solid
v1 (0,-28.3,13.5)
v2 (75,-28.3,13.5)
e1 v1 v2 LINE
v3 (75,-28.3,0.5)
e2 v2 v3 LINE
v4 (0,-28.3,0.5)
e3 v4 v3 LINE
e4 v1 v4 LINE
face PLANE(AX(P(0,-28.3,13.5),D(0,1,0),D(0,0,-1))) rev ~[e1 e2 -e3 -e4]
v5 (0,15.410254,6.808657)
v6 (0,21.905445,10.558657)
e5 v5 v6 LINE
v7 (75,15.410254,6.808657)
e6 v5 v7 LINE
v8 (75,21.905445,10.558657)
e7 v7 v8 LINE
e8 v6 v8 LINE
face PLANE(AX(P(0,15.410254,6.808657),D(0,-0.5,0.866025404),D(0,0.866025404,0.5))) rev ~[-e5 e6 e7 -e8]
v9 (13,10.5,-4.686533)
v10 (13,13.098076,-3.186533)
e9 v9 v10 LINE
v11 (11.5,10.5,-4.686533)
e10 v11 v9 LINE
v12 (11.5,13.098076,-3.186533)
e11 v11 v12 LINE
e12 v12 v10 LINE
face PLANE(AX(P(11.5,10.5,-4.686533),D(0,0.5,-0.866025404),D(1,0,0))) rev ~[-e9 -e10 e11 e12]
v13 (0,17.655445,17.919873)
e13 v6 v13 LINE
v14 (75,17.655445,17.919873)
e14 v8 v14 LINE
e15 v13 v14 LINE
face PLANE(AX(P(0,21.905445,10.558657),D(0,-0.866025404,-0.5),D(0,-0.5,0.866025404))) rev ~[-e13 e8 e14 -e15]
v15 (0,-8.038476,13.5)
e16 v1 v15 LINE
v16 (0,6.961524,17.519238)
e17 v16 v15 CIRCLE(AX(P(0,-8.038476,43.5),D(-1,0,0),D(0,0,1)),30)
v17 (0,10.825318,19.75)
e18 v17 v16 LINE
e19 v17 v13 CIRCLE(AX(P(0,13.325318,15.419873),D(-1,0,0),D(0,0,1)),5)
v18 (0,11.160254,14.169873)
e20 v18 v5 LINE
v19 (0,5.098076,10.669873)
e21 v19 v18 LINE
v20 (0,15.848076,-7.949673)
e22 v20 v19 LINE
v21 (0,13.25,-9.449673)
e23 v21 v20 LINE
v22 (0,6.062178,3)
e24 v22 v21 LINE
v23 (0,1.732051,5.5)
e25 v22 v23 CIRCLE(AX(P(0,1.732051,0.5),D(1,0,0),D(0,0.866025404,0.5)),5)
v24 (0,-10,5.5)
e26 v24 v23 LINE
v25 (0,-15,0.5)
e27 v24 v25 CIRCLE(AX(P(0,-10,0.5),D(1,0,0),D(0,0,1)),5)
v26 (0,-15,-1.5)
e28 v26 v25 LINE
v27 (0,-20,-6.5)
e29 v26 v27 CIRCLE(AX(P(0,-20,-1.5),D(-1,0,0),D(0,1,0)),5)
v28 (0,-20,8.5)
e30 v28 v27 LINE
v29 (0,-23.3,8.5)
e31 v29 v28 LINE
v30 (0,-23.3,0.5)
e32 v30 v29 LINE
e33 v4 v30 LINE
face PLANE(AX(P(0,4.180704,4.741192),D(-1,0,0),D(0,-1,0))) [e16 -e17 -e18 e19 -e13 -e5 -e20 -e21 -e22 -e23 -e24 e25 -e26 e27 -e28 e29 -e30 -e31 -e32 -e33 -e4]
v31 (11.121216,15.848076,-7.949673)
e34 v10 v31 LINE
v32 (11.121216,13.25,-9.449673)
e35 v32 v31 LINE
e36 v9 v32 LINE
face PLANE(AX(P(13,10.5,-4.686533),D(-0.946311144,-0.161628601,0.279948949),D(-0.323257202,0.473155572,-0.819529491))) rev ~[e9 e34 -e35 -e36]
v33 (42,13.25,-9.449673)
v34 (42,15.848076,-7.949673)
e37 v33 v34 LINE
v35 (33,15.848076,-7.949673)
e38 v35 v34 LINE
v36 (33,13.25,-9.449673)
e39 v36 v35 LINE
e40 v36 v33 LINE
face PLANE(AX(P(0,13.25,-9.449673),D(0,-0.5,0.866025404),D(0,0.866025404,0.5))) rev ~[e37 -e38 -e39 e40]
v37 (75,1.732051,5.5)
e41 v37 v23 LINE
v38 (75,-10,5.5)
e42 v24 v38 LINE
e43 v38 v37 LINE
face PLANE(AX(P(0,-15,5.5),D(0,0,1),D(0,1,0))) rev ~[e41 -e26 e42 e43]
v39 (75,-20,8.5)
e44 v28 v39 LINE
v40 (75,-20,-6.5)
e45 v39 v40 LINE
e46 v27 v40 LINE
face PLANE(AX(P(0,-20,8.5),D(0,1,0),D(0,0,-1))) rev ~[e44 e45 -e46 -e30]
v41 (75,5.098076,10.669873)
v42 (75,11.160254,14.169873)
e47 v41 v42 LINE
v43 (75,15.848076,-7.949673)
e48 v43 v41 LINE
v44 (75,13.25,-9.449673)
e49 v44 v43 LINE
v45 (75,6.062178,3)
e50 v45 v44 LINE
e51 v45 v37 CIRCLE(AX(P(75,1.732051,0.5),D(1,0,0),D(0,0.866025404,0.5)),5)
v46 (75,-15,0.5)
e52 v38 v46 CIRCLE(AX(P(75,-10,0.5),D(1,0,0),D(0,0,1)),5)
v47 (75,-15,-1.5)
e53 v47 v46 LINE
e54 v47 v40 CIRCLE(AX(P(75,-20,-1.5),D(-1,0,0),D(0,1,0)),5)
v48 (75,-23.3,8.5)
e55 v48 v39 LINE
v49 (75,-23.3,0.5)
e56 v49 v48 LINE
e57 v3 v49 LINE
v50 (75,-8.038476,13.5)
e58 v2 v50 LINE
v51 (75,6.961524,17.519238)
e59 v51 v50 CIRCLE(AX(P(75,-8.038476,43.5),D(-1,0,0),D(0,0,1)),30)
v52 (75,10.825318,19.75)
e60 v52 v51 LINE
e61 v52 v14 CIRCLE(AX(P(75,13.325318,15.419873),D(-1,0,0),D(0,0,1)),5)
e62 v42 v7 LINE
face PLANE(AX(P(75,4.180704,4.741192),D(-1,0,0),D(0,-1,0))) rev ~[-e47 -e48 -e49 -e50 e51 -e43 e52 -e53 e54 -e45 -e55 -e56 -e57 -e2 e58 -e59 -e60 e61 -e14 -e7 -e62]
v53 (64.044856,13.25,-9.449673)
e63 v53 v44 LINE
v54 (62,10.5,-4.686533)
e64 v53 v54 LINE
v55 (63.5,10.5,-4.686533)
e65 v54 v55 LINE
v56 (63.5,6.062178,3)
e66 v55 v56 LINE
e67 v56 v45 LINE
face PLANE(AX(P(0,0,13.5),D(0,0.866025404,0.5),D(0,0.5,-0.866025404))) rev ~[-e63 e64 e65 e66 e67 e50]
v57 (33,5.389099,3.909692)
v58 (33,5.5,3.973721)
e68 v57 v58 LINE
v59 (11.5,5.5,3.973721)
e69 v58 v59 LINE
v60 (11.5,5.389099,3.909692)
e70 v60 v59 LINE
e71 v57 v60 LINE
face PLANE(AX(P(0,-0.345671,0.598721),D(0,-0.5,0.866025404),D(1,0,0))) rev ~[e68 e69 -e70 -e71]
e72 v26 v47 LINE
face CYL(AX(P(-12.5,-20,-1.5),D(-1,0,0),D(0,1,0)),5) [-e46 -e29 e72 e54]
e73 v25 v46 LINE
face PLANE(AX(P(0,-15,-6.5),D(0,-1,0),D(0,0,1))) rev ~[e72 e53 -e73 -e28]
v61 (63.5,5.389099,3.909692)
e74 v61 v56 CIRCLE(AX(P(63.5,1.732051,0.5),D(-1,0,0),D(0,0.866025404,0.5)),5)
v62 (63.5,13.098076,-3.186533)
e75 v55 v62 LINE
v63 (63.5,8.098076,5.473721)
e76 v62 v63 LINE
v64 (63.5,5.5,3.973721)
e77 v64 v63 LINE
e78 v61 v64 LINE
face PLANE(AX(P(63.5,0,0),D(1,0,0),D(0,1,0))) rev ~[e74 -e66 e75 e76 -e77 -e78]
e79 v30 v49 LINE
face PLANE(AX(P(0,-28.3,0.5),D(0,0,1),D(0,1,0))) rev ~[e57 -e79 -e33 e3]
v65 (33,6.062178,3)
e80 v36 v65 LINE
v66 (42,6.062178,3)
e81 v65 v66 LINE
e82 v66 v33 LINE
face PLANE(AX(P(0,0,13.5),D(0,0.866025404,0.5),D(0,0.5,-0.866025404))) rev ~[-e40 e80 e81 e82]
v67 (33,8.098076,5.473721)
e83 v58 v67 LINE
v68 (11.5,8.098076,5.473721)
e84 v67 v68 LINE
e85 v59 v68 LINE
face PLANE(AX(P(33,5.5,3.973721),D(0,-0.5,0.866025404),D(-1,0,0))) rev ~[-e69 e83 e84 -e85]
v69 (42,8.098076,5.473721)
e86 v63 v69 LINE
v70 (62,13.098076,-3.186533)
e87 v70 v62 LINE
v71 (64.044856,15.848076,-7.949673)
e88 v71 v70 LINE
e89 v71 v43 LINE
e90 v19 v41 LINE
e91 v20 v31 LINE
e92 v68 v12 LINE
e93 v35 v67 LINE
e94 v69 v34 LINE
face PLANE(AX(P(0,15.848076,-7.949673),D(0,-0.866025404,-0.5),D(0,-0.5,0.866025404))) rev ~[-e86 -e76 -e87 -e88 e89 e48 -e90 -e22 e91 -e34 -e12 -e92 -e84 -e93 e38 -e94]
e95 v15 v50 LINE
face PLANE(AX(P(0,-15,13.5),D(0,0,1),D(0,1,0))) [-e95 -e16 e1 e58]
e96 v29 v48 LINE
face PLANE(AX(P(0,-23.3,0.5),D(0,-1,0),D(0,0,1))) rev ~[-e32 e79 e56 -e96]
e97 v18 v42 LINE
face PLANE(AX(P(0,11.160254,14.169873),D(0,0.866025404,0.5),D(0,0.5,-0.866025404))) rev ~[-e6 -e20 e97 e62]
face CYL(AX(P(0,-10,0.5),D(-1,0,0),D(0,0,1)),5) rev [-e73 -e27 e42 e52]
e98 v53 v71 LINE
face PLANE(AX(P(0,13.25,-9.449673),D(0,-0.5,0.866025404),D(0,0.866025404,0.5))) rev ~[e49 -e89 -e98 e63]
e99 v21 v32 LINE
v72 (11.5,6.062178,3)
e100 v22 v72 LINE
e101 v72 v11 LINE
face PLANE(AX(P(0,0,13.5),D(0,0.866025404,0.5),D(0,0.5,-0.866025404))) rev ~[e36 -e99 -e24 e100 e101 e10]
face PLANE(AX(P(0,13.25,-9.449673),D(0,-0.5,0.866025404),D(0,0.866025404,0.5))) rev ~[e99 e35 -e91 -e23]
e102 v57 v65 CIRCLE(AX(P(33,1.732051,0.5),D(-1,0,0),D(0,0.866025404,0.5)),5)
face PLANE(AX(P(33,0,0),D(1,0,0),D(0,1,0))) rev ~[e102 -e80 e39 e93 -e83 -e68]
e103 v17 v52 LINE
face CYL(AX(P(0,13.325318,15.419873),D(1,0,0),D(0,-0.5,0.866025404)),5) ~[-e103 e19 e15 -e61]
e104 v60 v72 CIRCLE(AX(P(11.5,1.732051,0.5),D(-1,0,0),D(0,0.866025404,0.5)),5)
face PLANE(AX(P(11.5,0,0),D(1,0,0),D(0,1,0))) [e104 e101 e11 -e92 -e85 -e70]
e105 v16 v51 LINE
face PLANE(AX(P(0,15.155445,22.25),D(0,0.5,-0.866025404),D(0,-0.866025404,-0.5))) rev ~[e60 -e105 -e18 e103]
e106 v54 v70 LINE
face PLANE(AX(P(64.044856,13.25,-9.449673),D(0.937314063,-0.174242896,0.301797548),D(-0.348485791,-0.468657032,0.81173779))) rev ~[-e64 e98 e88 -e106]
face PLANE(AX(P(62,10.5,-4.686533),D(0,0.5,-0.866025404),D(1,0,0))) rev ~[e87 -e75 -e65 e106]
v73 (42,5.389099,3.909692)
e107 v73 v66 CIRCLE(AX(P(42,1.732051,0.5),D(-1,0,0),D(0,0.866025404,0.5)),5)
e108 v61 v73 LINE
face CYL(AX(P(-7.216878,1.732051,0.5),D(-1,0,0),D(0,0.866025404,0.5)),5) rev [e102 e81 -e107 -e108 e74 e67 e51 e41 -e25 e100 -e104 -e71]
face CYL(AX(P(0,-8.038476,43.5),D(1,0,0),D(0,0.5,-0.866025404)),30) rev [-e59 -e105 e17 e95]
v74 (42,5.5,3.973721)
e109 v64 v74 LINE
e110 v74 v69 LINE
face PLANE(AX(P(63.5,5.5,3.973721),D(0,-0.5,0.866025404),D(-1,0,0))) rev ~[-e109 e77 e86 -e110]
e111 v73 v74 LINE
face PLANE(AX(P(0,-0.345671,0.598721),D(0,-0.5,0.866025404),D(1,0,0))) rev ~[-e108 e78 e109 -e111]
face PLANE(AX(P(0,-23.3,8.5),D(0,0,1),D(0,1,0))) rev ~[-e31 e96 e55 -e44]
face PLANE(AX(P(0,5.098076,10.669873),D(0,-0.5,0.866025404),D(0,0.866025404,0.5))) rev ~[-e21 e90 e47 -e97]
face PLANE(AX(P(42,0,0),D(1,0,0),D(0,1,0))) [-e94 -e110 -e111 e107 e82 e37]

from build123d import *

# Parameters (mm, degrees)
F1_DEPTH      = 75
F2_W          = 3.3
F2_H          = 5
F3_DEPTH      = 75
F5_DEPTH      = 3
F6_ANGLE      = -30
F7_W          = 15
F7_H          = 8
F8_DEPTH      = 75
F9_R          = 5
F10_T1_DEPTH  = 75
F10_T6_DEPTH  = 82.2168783649
F10_T11_DEPTH = 82.2168783649
F10_T17_DEPTH = 89.4337567297
F10_T23_DEPTH = 82.2168783649
F10_T25_DEPTH = 100
F11_R         = 30


# Not quite as in the source:
# - a fillet or chamfer that OpenCascade refuses, or shapes differently, is made with other operations: its cross-section is extruded or revolved along the edge and cut away or added


with BuildPart() as f1:
    # F0 (on Right) → F1 (new body)
    with BuildSketch(Plane.YZ):
        Polygon((3, 13.5), (0, 13.5), (0, -13), (3, -13), (3, 8.5), (10, 8.5), (10, 0), (17.5, 0), (17.5, 13.5), (10, 13.5), align=None)
    extrude(amount=F1_DEPTH)

    # F4 (on Front) → F5 (cut, through all)
    with BuildSketch(Plane.XZ):
        Polygon((11.5, 2.5), (11.5, -7.5), (13, -7.5), (11.1212156062, -13), (33, -13), (33, -7.4999375637), (33, 2.5), align=None)
        Polygon((63.5, 2.5), (42, 2.5), (42, -7.4999375637), (42, -13), (64.044855535, -13), (62, -7.5), (63.5, -7.5), align=None)
    extrude(amount=-F5_DEPTH, mode=Mode.SUBTRACT)


with BuildPart() as f3:
    # F2 (on Right) → F3 (new body)
    with BuildSketch(Plane.YZ):
        Polygon((-23.3, 13.5), (-28.3, 13.5), (-28.3, 0.5), (-23.3, 0.5), (-23.3, 8.5), align=None)
        with Locations((-21.65, 11)):
            Rectangle(F2_W, F2_H)
        Polygon((-15, 13.5), (-20, 13.5), (-20, 8.5), (-20, -6.5), (-15, -6.5), align=None)
    extrude(amount=F3_DEPTH)


with BuildPart() as f1_1:
    # F6: moved
    add(f1.part.rotate(Axis((37.5, 0, 13.5), (-1, 0, 0)), F6_ANGLE))


    add(f3.part)  # F8 merges F3
    # F7 (on Right) → F8 (join)
    with BuildSketch(Plane.YZ):
        with Locations((-7.5, 9.5)):
            Rectangle(F7_W, F7_H)
        Polygon((5.764299538, 5.5), (0, 13.5), (0, 5.5), align=None)
    extrude(amount=F8_DEPTH)

    # F9
    f9_edges = [f1_1.edges().sort_by_distance(p)[0] for p in [
        (37.5, 15.155445, 22.25),
    ]]
    fillet(f9_edges, radius=F9_R)

    # F10: fillet of radius 5 on 3 edges, made by hand

    # F10_s2 → F10_t1 (join)
    with BuildSketch(Plane.YZ):
        with BuildLine():
            ThreePointArc((-10, 5.5), (-13.5355339059, 4.0355339059), (-15, 0.5))
            Line((-15, 0.5), (-15, 5.5))
            Line((-15, 5.5), (-10, 5.5))
        make_face()
    extrude(amount=F10_T1_DEPTH)


with BuildPart() as f10_tool4:
    # F10_s5 → F10_t6 (new body)
    with BuildSketch(Plane.YZ):
        with BuildLine():
            ThreePointArc((6.0621778265, 3), (4.2320508076, 4.8301270189), (1.7320508076, 5.5))
            Line((1.7320508076, 5.5), (4.6188021535, 5.5))
            Line((4.6188021535, 5.5), (6.0621778265, 3))
        make_face()
    extrude(amount=F10_T6_DEPTH)

    split(bisect_by=Plane.YZ.offset(11.5), keep=Keep.BOTTOM)


with BuildPart() as f1_2:
    add(f1_1.part)

    # F10_t3: union F10_tool4
    add(f10_tool4.part)


with BuildPart() as f10_tool9:
    # F10_s10 → F10_t11 (new body)
    with BuildSketch(Plane.YZ.offset(-7.2168783649)):
        with BuildLine():
            ThreePointArc((6.0621778265, 3), (4.2320508076, 4.8301270189), (1.7320508076, 5.5))
            Line((1.7320508076, 5.5), (4.6188021535, 5.5))
            Line((4.6188021535, 5.5), (6.0621778265, 3))
        make_face()
    extrude(amount=F10_T11_DEPTH)

    split(bisect_by=Plane(origin=(0, -0.3456714755, 0.5987205584), x_dir=(1, 0, 0), z_dir=(0, -0.5, 0.8660254038)), keep=Keep.TOP)

    split(bisect_by=Plane.YZ.offset(11.5), keep=Keep.TOP)


with BuildPart() as f1_3:
    add(f1_2.part)

    # F10_t8: union F10_tool9
    add(f10_tool9.part)


with BuildPart() as f10_tool15:
    # F10_s16 → F10_t17 (new body)
    with BuildSketch(Plane.YZ.offset(-7.2168783649)):
        with BuildLine():
            ThreePointArc((6.0621778265, 3), (4.2320508076, 4.8301270189), (1.7320508076, 5.5))
            Line((1.7320508076, 5.5), (4.6188021535, 5.5))
            Line((4.6188021535, 5.5), (6.0621778265, 3))
        make_face()
    extrude(amount=F10_T17_DEPTH)

    split(bisect_by=Plane.YZ.offset(42), keep=Keep.BOTTOM)

    split(bisect_by=Plane.YZ.offset(33), keep=Keep.TOP)


with BuildPart() as f1_4:
    add(f1_3.part)

    # F10_t14: union F10_tool15
    add(f10_tool15.part)


with BuildPart() as f10_tool21:
    # F10_s22 → F10_t23 (new body)
    with BuildSketch(Plane.YZ.offset(-7.2168783649)):
        with BuildLine():
            ThreePointArc((6.0621778265, 3), (4.2320508076, 4.8301270189), (1.7320508076, 5.5))
            Line((1.7320508076, 5.5), (4.6188021535, 5.5))
            Line((4.6188021535, 5.5), (6.0621778265, 3))
        make_face()
    extrude(amount=F10_T23_DEPTH)

    split(bisect_by=Plane.YZ.offset(63.5), keep=Keep.TOP)


with BuildPart() as f1_5:
    add(f1_4.part)

    # F10_t20: union F10_tool21
    add(f10_tool21.part)

    # F10_s26 → F10_t25 (cut)
    with BuildSketch(Plane.YZ.offset(-12.5)):
        with BuildLine():
            ThreePointArc((-15, -1.5), (-16.4644660941, -5.0355339059), (-20, -6.5))
            Line((-20, -6.5), (-15, -6.5))
            Line((-15, -6.5), (-15, -1.5))
        make_face()
    extrude(amount=F10_T25_DEPTH, mode=Mode.SUBTRACT)

    # F11
    f11_edges = [f1_5.edges().sort_by_distance(p)[0] for p in [
        (37.5, 0, 13.5),
    ]]
    fillet(f11_edges, radius=F11_R)


solid = f1_5.part
